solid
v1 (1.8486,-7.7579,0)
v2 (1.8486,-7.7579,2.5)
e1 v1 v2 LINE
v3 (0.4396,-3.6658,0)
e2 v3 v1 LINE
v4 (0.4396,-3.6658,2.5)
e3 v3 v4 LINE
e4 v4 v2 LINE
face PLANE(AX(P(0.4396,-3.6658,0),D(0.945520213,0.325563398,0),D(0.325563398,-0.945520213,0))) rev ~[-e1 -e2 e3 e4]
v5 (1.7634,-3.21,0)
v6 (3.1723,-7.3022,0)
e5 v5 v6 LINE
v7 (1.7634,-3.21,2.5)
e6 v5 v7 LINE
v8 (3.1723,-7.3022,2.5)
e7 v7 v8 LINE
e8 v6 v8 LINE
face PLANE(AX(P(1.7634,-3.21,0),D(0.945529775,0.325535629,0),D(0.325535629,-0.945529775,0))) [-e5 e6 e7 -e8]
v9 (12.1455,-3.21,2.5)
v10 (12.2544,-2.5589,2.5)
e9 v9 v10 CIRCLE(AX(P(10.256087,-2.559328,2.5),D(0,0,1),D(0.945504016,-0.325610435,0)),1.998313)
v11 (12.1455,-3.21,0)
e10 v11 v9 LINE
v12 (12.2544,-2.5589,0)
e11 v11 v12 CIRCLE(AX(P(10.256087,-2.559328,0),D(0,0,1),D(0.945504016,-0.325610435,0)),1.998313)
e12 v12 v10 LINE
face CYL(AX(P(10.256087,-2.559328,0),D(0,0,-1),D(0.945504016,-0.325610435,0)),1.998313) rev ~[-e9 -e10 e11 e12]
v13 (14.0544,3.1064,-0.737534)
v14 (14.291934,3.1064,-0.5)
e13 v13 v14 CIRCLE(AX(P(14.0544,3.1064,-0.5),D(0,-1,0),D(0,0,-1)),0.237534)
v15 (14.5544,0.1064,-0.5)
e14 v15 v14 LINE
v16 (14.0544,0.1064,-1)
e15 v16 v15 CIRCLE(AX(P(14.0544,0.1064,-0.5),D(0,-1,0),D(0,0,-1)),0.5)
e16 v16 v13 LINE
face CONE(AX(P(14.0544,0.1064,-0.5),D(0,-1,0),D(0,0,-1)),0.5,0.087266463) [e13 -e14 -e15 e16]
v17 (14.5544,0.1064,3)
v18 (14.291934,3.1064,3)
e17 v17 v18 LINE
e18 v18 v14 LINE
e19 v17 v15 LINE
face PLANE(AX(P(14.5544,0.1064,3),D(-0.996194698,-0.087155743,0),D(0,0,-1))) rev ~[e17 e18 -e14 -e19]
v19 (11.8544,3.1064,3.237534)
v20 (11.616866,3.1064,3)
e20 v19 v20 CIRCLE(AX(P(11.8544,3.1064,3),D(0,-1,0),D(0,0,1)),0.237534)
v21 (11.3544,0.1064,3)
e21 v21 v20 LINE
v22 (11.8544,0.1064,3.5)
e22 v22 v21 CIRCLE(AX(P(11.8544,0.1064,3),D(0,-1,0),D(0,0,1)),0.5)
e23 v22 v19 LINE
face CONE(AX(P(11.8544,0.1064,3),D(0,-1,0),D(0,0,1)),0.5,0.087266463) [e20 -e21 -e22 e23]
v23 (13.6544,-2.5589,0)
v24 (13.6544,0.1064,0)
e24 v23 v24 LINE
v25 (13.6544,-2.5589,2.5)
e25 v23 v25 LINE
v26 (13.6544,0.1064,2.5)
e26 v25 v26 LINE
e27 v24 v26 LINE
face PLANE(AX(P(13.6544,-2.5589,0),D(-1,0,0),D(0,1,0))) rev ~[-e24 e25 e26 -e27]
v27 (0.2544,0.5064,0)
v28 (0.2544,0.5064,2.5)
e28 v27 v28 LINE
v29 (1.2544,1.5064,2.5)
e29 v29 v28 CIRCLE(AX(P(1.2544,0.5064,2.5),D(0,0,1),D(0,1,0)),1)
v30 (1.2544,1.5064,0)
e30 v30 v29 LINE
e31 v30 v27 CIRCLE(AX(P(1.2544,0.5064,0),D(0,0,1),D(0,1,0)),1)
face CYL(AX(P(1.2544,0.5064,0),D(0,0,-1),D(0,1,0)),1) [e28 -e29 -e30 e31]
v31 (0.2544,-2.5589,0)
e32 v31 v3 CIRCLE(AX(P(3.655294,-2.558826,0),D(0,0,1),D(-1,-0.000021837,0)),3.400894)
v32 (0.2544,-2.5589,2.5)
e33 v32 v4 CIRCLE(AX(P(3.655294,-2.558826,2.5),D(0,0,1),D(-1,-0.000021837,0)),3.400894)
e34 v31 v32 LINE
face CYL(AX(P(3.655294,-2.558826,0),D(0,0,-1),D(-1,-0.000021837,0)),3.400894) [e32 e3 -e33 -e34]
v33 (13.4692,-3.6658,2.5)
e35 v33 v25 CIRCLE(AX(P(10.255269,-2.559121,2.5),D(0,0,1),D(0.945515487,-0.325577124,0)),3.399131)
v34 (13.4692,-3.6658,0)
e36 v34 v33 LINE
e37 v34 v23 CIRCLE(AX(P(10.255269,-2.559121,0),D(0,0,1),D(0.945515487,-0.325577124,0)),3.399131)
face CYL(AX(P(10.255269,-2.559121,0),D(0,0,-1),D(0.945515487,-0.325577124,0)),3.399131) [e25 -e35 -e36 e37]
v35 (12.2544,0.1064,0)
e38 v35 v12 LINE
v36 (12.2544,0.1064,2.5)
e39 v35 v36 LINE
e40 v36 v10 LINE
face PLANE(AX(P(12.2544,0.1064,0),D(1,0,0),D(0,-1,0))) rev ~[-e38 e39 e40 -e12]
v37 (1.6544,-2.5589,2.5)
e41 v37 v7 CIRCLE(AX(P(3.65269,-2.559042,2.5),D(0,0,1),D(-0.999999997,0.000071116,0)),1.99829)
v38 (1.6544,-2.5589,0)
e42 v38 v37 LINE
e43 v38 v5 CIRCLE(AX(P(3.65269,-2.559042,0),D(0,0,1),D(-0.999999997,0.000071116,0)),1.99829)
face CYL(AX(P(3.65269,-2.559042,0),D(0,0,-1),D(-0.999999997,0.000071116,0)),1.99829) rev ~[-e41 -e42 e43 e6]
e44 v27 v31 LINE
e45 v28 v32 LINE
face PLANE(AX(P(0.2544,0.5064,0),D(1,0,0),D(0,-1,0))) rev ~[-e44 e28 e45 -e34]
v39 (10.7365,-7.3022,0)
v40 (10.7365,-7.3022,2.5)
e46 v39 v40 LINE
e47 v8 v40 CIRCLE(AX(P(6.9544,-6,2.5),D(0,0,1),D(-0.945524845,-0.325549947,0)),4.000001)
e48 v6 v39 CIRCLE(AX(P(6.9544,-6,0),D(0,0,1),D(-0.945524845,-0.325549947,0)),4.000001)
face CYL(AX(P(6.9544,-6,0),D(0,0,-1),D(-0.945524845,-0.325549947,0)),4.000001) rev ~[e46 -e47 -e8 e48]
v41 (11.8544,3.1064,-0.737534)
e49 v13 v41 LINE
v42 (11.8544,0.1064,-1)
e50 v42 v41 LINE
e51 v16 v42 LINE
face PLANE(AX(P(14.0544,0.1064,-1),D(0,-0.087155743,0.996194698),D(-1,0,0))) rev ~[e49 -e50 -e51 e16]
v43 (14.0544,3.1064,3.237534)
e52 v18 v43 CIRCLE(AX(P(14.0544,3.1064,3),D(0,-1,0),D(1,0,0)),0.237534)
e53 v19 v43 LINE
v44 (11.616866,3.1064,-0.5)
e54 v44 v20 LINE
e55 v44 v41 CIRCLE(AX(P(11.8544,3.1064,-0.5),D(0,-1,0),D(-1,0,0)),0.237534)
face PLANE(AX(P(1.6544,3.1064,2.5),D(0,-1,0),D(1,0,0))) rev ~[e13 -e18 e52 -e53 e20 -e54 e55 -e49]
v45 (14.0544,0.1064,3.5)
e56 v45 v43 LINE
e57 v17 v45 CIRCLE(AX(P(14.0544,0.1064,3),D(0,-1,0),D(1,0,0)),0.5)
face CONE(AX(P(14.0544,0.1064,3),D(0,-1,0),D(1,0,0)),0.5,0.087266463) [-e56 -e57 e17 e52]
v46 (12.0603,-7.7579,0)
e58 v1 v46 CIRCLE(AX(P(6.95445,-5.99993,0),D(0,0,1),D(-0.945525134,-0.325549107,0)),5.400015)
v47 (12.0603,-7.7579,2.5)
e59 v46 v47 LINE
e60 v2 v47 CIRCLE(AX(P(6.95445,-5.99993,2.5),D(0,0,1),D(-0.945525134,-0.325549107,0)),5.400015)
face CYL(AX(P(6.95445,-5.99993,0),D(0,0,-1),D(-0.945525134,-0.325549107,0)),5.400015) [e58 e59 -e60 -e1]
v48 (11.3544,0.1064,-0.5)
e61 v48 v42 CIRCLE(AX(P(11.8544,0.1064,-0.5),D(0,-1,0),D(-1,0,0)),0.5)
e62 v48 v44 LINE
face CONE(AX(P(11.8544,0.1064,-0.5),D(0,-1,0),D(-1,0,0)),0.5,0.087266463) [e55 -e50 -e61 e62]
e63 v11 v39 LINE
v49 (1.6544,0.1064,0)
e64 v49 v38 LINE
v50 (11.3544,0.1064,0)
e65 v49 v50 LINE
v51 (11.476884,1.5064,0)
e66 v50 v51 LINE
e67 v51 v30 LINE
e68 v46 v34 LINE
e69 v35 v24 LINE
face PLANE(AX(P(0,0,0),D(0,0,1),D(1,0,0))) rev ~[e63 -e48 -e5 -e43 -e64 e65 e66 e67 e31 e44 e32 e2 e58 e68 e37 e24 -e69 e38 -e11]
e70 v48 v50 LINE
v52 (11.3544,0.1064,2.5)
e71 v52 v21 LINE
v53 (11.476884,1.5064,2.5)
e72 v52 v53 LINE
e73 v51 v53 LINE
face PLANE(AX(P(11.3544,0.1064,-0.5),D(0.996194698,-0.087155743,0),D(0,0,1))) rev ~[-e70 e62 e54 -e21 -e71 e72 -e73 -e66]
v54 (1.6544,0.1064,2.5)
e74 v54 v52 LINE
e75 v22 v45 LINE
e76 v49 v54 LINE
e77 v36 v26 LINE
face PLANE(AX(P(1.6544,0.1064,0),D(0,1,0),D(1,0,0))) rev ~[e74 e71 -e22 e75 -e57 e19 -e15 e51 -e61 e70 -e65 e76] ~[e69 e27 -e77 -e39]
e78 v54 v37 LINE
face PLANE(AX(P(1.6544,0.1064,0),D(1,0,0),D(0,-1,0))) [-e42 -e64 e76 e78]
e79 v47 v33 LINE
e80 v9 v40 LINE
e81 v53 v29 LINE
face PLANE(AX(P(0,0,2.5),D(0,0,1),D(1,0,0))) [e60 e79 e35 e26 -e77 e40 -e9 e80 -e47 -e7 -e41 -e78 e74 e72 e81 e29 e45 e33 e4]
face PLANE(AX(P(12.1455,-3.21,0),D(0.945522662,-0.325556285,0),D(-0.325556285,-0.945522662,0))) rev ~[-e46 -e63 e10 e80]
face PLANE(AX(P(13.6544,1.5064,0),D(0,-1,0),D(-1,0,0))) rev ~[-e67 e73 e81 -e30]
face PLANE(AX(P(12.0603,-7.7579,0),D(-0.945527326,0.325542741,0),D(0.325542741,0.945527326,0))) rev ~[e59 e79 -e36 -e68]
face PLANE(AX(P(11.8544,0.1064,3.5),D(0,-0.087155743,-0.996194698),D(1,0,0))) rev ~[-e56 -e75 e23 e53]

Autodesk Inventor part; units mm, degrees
ref_plane "YZ Plane" through (0, 0, 0) normal (1, 0, 0) x (0, 1, 0)
ref_plane "XZ Plane" through (0, 0, 0) normal (0, 1, 0) x (-1, 0, 0)
ref_plane "XY Plane" through (0, 0, 0) normal (0, 0, 1) x (1, 0, 0)
sketch "Sketch1" plane through (0, 0, 0) normal (0, 0, 1) x (1, 0, 0)
  arc A0 (3.1723, -7.3022) -> (10.7365, -7.3022) centre (6.9544, -6) ccw
  line L0 (1.6544, 0.1064) -> (1.6544, -2.5589)
  line L1 (1.6544, 0.1064) -> (12.2544, 0.1064)
  line L2 (12.2544, 0.1064) -> (12.2544, -2.5589)
  line L3 (1.7634, -3.21) -> (3.1723, -7.3022)
  line L4 (12.1455, -3.21) -> (10.7365, -7.3022)
  arc A1 (1.6544, -2.5589) -> (1.7634, -3.21) centre (3.6544, -2.5589) ccw
  arc A2 (12.1455, -3.21) -> (12.2544, -2.5589) centre (10.2544, -2.5589) ccw
  line L5 (12.0603, -7.7579) -> (13.4692, -3.6658)
  arc A3 (13.4692, -3.6658) -> (13.6544, -2.5589) centre (10.2544, -2.5589) ccw
  line L6 (13.6544, -2.5589) -> (13.6544, 1.5064)
  line L7 (13.6544, 1.5064) -> (1.2544, 1.5064)
  line L8 (0.2544, 0.5064) -> (0.2544, -2.5589)
  arc A4 (0.2544, -2.5589) -> (0.4396, -3.6658) centre (3.6544, -2.5589) ccw
  line L9 (0.4396, -3.6658) -> (1.8486, -7.7579)
  arc A5 (1.8486, -7.7579) -> (12.0603, -7.7579) centre (6.9544, -6) ccw
  arc A6 (1.2544, 1.5064) -> (0.2544, 0.5064) centre (1.2544, 0.5064) ccw
  point P0 (1.6544, -2.8936)
  point P1 (12.2544, -2.8936)
  point P2 (13.6544, 0.2)
  point P3 (12.7544, 1.5064)
  dimension "d12" = 4
  dimension "d13" = 3
  dimension "d14" = 3
  dimension "d16" = 2
  dimension "d17" = 1.4
  dimension "d18" = 1
  dimension "d35" = 10.6
extrude "Extrusion1" add sketch "Sketch1" along normal blind 2.5
sketch "Sketch3" plane through (1.6544, 0.1064, 2.5) normal (0, -1, 0) x (1, 0, 0)
  line L0 (10.2, 1) -> (12.4, 1)
  line L1 (12.9, 0.5) -> (12.9, -3)
  line L2 (12.4, -3.5) -> (10.2, -3.5)
  line L3 (9.7, -3) -> (9.7, 0.5)
  arc A0 (12.9, 0.5) -> (12.4, 1) centre (12.4, 0.5) ccw
  arc A1 (12.4, -3.5) -> (12.9, -3) centre (12.4, -3) ccw
  arc A2 (9.7, -3) -> (10.2, -3.5) centre (10.2, -3) ccw
  arc A3 (10.2, 1) -> (9.7, 0.5) centre (10.2, 0.5) ccw
  line L4 (-1.4, -2.5) -> (-1.4, 0) projected
  point P0 (9.7, 1)
  point P1 (12.9, -3.5)
  point P2 (12.9, 1)
  point P3 (9.7, -3.5)
  dimension "d21" = 4.5
  dimension "d22" = 3.2
  dimension "d27" = 0.5
  dimension "d36" = 11.1
extrude "Extrusion2" add sketch "Sketch3" against normal blind 3 draft -5
properties part number "fastener_01"
